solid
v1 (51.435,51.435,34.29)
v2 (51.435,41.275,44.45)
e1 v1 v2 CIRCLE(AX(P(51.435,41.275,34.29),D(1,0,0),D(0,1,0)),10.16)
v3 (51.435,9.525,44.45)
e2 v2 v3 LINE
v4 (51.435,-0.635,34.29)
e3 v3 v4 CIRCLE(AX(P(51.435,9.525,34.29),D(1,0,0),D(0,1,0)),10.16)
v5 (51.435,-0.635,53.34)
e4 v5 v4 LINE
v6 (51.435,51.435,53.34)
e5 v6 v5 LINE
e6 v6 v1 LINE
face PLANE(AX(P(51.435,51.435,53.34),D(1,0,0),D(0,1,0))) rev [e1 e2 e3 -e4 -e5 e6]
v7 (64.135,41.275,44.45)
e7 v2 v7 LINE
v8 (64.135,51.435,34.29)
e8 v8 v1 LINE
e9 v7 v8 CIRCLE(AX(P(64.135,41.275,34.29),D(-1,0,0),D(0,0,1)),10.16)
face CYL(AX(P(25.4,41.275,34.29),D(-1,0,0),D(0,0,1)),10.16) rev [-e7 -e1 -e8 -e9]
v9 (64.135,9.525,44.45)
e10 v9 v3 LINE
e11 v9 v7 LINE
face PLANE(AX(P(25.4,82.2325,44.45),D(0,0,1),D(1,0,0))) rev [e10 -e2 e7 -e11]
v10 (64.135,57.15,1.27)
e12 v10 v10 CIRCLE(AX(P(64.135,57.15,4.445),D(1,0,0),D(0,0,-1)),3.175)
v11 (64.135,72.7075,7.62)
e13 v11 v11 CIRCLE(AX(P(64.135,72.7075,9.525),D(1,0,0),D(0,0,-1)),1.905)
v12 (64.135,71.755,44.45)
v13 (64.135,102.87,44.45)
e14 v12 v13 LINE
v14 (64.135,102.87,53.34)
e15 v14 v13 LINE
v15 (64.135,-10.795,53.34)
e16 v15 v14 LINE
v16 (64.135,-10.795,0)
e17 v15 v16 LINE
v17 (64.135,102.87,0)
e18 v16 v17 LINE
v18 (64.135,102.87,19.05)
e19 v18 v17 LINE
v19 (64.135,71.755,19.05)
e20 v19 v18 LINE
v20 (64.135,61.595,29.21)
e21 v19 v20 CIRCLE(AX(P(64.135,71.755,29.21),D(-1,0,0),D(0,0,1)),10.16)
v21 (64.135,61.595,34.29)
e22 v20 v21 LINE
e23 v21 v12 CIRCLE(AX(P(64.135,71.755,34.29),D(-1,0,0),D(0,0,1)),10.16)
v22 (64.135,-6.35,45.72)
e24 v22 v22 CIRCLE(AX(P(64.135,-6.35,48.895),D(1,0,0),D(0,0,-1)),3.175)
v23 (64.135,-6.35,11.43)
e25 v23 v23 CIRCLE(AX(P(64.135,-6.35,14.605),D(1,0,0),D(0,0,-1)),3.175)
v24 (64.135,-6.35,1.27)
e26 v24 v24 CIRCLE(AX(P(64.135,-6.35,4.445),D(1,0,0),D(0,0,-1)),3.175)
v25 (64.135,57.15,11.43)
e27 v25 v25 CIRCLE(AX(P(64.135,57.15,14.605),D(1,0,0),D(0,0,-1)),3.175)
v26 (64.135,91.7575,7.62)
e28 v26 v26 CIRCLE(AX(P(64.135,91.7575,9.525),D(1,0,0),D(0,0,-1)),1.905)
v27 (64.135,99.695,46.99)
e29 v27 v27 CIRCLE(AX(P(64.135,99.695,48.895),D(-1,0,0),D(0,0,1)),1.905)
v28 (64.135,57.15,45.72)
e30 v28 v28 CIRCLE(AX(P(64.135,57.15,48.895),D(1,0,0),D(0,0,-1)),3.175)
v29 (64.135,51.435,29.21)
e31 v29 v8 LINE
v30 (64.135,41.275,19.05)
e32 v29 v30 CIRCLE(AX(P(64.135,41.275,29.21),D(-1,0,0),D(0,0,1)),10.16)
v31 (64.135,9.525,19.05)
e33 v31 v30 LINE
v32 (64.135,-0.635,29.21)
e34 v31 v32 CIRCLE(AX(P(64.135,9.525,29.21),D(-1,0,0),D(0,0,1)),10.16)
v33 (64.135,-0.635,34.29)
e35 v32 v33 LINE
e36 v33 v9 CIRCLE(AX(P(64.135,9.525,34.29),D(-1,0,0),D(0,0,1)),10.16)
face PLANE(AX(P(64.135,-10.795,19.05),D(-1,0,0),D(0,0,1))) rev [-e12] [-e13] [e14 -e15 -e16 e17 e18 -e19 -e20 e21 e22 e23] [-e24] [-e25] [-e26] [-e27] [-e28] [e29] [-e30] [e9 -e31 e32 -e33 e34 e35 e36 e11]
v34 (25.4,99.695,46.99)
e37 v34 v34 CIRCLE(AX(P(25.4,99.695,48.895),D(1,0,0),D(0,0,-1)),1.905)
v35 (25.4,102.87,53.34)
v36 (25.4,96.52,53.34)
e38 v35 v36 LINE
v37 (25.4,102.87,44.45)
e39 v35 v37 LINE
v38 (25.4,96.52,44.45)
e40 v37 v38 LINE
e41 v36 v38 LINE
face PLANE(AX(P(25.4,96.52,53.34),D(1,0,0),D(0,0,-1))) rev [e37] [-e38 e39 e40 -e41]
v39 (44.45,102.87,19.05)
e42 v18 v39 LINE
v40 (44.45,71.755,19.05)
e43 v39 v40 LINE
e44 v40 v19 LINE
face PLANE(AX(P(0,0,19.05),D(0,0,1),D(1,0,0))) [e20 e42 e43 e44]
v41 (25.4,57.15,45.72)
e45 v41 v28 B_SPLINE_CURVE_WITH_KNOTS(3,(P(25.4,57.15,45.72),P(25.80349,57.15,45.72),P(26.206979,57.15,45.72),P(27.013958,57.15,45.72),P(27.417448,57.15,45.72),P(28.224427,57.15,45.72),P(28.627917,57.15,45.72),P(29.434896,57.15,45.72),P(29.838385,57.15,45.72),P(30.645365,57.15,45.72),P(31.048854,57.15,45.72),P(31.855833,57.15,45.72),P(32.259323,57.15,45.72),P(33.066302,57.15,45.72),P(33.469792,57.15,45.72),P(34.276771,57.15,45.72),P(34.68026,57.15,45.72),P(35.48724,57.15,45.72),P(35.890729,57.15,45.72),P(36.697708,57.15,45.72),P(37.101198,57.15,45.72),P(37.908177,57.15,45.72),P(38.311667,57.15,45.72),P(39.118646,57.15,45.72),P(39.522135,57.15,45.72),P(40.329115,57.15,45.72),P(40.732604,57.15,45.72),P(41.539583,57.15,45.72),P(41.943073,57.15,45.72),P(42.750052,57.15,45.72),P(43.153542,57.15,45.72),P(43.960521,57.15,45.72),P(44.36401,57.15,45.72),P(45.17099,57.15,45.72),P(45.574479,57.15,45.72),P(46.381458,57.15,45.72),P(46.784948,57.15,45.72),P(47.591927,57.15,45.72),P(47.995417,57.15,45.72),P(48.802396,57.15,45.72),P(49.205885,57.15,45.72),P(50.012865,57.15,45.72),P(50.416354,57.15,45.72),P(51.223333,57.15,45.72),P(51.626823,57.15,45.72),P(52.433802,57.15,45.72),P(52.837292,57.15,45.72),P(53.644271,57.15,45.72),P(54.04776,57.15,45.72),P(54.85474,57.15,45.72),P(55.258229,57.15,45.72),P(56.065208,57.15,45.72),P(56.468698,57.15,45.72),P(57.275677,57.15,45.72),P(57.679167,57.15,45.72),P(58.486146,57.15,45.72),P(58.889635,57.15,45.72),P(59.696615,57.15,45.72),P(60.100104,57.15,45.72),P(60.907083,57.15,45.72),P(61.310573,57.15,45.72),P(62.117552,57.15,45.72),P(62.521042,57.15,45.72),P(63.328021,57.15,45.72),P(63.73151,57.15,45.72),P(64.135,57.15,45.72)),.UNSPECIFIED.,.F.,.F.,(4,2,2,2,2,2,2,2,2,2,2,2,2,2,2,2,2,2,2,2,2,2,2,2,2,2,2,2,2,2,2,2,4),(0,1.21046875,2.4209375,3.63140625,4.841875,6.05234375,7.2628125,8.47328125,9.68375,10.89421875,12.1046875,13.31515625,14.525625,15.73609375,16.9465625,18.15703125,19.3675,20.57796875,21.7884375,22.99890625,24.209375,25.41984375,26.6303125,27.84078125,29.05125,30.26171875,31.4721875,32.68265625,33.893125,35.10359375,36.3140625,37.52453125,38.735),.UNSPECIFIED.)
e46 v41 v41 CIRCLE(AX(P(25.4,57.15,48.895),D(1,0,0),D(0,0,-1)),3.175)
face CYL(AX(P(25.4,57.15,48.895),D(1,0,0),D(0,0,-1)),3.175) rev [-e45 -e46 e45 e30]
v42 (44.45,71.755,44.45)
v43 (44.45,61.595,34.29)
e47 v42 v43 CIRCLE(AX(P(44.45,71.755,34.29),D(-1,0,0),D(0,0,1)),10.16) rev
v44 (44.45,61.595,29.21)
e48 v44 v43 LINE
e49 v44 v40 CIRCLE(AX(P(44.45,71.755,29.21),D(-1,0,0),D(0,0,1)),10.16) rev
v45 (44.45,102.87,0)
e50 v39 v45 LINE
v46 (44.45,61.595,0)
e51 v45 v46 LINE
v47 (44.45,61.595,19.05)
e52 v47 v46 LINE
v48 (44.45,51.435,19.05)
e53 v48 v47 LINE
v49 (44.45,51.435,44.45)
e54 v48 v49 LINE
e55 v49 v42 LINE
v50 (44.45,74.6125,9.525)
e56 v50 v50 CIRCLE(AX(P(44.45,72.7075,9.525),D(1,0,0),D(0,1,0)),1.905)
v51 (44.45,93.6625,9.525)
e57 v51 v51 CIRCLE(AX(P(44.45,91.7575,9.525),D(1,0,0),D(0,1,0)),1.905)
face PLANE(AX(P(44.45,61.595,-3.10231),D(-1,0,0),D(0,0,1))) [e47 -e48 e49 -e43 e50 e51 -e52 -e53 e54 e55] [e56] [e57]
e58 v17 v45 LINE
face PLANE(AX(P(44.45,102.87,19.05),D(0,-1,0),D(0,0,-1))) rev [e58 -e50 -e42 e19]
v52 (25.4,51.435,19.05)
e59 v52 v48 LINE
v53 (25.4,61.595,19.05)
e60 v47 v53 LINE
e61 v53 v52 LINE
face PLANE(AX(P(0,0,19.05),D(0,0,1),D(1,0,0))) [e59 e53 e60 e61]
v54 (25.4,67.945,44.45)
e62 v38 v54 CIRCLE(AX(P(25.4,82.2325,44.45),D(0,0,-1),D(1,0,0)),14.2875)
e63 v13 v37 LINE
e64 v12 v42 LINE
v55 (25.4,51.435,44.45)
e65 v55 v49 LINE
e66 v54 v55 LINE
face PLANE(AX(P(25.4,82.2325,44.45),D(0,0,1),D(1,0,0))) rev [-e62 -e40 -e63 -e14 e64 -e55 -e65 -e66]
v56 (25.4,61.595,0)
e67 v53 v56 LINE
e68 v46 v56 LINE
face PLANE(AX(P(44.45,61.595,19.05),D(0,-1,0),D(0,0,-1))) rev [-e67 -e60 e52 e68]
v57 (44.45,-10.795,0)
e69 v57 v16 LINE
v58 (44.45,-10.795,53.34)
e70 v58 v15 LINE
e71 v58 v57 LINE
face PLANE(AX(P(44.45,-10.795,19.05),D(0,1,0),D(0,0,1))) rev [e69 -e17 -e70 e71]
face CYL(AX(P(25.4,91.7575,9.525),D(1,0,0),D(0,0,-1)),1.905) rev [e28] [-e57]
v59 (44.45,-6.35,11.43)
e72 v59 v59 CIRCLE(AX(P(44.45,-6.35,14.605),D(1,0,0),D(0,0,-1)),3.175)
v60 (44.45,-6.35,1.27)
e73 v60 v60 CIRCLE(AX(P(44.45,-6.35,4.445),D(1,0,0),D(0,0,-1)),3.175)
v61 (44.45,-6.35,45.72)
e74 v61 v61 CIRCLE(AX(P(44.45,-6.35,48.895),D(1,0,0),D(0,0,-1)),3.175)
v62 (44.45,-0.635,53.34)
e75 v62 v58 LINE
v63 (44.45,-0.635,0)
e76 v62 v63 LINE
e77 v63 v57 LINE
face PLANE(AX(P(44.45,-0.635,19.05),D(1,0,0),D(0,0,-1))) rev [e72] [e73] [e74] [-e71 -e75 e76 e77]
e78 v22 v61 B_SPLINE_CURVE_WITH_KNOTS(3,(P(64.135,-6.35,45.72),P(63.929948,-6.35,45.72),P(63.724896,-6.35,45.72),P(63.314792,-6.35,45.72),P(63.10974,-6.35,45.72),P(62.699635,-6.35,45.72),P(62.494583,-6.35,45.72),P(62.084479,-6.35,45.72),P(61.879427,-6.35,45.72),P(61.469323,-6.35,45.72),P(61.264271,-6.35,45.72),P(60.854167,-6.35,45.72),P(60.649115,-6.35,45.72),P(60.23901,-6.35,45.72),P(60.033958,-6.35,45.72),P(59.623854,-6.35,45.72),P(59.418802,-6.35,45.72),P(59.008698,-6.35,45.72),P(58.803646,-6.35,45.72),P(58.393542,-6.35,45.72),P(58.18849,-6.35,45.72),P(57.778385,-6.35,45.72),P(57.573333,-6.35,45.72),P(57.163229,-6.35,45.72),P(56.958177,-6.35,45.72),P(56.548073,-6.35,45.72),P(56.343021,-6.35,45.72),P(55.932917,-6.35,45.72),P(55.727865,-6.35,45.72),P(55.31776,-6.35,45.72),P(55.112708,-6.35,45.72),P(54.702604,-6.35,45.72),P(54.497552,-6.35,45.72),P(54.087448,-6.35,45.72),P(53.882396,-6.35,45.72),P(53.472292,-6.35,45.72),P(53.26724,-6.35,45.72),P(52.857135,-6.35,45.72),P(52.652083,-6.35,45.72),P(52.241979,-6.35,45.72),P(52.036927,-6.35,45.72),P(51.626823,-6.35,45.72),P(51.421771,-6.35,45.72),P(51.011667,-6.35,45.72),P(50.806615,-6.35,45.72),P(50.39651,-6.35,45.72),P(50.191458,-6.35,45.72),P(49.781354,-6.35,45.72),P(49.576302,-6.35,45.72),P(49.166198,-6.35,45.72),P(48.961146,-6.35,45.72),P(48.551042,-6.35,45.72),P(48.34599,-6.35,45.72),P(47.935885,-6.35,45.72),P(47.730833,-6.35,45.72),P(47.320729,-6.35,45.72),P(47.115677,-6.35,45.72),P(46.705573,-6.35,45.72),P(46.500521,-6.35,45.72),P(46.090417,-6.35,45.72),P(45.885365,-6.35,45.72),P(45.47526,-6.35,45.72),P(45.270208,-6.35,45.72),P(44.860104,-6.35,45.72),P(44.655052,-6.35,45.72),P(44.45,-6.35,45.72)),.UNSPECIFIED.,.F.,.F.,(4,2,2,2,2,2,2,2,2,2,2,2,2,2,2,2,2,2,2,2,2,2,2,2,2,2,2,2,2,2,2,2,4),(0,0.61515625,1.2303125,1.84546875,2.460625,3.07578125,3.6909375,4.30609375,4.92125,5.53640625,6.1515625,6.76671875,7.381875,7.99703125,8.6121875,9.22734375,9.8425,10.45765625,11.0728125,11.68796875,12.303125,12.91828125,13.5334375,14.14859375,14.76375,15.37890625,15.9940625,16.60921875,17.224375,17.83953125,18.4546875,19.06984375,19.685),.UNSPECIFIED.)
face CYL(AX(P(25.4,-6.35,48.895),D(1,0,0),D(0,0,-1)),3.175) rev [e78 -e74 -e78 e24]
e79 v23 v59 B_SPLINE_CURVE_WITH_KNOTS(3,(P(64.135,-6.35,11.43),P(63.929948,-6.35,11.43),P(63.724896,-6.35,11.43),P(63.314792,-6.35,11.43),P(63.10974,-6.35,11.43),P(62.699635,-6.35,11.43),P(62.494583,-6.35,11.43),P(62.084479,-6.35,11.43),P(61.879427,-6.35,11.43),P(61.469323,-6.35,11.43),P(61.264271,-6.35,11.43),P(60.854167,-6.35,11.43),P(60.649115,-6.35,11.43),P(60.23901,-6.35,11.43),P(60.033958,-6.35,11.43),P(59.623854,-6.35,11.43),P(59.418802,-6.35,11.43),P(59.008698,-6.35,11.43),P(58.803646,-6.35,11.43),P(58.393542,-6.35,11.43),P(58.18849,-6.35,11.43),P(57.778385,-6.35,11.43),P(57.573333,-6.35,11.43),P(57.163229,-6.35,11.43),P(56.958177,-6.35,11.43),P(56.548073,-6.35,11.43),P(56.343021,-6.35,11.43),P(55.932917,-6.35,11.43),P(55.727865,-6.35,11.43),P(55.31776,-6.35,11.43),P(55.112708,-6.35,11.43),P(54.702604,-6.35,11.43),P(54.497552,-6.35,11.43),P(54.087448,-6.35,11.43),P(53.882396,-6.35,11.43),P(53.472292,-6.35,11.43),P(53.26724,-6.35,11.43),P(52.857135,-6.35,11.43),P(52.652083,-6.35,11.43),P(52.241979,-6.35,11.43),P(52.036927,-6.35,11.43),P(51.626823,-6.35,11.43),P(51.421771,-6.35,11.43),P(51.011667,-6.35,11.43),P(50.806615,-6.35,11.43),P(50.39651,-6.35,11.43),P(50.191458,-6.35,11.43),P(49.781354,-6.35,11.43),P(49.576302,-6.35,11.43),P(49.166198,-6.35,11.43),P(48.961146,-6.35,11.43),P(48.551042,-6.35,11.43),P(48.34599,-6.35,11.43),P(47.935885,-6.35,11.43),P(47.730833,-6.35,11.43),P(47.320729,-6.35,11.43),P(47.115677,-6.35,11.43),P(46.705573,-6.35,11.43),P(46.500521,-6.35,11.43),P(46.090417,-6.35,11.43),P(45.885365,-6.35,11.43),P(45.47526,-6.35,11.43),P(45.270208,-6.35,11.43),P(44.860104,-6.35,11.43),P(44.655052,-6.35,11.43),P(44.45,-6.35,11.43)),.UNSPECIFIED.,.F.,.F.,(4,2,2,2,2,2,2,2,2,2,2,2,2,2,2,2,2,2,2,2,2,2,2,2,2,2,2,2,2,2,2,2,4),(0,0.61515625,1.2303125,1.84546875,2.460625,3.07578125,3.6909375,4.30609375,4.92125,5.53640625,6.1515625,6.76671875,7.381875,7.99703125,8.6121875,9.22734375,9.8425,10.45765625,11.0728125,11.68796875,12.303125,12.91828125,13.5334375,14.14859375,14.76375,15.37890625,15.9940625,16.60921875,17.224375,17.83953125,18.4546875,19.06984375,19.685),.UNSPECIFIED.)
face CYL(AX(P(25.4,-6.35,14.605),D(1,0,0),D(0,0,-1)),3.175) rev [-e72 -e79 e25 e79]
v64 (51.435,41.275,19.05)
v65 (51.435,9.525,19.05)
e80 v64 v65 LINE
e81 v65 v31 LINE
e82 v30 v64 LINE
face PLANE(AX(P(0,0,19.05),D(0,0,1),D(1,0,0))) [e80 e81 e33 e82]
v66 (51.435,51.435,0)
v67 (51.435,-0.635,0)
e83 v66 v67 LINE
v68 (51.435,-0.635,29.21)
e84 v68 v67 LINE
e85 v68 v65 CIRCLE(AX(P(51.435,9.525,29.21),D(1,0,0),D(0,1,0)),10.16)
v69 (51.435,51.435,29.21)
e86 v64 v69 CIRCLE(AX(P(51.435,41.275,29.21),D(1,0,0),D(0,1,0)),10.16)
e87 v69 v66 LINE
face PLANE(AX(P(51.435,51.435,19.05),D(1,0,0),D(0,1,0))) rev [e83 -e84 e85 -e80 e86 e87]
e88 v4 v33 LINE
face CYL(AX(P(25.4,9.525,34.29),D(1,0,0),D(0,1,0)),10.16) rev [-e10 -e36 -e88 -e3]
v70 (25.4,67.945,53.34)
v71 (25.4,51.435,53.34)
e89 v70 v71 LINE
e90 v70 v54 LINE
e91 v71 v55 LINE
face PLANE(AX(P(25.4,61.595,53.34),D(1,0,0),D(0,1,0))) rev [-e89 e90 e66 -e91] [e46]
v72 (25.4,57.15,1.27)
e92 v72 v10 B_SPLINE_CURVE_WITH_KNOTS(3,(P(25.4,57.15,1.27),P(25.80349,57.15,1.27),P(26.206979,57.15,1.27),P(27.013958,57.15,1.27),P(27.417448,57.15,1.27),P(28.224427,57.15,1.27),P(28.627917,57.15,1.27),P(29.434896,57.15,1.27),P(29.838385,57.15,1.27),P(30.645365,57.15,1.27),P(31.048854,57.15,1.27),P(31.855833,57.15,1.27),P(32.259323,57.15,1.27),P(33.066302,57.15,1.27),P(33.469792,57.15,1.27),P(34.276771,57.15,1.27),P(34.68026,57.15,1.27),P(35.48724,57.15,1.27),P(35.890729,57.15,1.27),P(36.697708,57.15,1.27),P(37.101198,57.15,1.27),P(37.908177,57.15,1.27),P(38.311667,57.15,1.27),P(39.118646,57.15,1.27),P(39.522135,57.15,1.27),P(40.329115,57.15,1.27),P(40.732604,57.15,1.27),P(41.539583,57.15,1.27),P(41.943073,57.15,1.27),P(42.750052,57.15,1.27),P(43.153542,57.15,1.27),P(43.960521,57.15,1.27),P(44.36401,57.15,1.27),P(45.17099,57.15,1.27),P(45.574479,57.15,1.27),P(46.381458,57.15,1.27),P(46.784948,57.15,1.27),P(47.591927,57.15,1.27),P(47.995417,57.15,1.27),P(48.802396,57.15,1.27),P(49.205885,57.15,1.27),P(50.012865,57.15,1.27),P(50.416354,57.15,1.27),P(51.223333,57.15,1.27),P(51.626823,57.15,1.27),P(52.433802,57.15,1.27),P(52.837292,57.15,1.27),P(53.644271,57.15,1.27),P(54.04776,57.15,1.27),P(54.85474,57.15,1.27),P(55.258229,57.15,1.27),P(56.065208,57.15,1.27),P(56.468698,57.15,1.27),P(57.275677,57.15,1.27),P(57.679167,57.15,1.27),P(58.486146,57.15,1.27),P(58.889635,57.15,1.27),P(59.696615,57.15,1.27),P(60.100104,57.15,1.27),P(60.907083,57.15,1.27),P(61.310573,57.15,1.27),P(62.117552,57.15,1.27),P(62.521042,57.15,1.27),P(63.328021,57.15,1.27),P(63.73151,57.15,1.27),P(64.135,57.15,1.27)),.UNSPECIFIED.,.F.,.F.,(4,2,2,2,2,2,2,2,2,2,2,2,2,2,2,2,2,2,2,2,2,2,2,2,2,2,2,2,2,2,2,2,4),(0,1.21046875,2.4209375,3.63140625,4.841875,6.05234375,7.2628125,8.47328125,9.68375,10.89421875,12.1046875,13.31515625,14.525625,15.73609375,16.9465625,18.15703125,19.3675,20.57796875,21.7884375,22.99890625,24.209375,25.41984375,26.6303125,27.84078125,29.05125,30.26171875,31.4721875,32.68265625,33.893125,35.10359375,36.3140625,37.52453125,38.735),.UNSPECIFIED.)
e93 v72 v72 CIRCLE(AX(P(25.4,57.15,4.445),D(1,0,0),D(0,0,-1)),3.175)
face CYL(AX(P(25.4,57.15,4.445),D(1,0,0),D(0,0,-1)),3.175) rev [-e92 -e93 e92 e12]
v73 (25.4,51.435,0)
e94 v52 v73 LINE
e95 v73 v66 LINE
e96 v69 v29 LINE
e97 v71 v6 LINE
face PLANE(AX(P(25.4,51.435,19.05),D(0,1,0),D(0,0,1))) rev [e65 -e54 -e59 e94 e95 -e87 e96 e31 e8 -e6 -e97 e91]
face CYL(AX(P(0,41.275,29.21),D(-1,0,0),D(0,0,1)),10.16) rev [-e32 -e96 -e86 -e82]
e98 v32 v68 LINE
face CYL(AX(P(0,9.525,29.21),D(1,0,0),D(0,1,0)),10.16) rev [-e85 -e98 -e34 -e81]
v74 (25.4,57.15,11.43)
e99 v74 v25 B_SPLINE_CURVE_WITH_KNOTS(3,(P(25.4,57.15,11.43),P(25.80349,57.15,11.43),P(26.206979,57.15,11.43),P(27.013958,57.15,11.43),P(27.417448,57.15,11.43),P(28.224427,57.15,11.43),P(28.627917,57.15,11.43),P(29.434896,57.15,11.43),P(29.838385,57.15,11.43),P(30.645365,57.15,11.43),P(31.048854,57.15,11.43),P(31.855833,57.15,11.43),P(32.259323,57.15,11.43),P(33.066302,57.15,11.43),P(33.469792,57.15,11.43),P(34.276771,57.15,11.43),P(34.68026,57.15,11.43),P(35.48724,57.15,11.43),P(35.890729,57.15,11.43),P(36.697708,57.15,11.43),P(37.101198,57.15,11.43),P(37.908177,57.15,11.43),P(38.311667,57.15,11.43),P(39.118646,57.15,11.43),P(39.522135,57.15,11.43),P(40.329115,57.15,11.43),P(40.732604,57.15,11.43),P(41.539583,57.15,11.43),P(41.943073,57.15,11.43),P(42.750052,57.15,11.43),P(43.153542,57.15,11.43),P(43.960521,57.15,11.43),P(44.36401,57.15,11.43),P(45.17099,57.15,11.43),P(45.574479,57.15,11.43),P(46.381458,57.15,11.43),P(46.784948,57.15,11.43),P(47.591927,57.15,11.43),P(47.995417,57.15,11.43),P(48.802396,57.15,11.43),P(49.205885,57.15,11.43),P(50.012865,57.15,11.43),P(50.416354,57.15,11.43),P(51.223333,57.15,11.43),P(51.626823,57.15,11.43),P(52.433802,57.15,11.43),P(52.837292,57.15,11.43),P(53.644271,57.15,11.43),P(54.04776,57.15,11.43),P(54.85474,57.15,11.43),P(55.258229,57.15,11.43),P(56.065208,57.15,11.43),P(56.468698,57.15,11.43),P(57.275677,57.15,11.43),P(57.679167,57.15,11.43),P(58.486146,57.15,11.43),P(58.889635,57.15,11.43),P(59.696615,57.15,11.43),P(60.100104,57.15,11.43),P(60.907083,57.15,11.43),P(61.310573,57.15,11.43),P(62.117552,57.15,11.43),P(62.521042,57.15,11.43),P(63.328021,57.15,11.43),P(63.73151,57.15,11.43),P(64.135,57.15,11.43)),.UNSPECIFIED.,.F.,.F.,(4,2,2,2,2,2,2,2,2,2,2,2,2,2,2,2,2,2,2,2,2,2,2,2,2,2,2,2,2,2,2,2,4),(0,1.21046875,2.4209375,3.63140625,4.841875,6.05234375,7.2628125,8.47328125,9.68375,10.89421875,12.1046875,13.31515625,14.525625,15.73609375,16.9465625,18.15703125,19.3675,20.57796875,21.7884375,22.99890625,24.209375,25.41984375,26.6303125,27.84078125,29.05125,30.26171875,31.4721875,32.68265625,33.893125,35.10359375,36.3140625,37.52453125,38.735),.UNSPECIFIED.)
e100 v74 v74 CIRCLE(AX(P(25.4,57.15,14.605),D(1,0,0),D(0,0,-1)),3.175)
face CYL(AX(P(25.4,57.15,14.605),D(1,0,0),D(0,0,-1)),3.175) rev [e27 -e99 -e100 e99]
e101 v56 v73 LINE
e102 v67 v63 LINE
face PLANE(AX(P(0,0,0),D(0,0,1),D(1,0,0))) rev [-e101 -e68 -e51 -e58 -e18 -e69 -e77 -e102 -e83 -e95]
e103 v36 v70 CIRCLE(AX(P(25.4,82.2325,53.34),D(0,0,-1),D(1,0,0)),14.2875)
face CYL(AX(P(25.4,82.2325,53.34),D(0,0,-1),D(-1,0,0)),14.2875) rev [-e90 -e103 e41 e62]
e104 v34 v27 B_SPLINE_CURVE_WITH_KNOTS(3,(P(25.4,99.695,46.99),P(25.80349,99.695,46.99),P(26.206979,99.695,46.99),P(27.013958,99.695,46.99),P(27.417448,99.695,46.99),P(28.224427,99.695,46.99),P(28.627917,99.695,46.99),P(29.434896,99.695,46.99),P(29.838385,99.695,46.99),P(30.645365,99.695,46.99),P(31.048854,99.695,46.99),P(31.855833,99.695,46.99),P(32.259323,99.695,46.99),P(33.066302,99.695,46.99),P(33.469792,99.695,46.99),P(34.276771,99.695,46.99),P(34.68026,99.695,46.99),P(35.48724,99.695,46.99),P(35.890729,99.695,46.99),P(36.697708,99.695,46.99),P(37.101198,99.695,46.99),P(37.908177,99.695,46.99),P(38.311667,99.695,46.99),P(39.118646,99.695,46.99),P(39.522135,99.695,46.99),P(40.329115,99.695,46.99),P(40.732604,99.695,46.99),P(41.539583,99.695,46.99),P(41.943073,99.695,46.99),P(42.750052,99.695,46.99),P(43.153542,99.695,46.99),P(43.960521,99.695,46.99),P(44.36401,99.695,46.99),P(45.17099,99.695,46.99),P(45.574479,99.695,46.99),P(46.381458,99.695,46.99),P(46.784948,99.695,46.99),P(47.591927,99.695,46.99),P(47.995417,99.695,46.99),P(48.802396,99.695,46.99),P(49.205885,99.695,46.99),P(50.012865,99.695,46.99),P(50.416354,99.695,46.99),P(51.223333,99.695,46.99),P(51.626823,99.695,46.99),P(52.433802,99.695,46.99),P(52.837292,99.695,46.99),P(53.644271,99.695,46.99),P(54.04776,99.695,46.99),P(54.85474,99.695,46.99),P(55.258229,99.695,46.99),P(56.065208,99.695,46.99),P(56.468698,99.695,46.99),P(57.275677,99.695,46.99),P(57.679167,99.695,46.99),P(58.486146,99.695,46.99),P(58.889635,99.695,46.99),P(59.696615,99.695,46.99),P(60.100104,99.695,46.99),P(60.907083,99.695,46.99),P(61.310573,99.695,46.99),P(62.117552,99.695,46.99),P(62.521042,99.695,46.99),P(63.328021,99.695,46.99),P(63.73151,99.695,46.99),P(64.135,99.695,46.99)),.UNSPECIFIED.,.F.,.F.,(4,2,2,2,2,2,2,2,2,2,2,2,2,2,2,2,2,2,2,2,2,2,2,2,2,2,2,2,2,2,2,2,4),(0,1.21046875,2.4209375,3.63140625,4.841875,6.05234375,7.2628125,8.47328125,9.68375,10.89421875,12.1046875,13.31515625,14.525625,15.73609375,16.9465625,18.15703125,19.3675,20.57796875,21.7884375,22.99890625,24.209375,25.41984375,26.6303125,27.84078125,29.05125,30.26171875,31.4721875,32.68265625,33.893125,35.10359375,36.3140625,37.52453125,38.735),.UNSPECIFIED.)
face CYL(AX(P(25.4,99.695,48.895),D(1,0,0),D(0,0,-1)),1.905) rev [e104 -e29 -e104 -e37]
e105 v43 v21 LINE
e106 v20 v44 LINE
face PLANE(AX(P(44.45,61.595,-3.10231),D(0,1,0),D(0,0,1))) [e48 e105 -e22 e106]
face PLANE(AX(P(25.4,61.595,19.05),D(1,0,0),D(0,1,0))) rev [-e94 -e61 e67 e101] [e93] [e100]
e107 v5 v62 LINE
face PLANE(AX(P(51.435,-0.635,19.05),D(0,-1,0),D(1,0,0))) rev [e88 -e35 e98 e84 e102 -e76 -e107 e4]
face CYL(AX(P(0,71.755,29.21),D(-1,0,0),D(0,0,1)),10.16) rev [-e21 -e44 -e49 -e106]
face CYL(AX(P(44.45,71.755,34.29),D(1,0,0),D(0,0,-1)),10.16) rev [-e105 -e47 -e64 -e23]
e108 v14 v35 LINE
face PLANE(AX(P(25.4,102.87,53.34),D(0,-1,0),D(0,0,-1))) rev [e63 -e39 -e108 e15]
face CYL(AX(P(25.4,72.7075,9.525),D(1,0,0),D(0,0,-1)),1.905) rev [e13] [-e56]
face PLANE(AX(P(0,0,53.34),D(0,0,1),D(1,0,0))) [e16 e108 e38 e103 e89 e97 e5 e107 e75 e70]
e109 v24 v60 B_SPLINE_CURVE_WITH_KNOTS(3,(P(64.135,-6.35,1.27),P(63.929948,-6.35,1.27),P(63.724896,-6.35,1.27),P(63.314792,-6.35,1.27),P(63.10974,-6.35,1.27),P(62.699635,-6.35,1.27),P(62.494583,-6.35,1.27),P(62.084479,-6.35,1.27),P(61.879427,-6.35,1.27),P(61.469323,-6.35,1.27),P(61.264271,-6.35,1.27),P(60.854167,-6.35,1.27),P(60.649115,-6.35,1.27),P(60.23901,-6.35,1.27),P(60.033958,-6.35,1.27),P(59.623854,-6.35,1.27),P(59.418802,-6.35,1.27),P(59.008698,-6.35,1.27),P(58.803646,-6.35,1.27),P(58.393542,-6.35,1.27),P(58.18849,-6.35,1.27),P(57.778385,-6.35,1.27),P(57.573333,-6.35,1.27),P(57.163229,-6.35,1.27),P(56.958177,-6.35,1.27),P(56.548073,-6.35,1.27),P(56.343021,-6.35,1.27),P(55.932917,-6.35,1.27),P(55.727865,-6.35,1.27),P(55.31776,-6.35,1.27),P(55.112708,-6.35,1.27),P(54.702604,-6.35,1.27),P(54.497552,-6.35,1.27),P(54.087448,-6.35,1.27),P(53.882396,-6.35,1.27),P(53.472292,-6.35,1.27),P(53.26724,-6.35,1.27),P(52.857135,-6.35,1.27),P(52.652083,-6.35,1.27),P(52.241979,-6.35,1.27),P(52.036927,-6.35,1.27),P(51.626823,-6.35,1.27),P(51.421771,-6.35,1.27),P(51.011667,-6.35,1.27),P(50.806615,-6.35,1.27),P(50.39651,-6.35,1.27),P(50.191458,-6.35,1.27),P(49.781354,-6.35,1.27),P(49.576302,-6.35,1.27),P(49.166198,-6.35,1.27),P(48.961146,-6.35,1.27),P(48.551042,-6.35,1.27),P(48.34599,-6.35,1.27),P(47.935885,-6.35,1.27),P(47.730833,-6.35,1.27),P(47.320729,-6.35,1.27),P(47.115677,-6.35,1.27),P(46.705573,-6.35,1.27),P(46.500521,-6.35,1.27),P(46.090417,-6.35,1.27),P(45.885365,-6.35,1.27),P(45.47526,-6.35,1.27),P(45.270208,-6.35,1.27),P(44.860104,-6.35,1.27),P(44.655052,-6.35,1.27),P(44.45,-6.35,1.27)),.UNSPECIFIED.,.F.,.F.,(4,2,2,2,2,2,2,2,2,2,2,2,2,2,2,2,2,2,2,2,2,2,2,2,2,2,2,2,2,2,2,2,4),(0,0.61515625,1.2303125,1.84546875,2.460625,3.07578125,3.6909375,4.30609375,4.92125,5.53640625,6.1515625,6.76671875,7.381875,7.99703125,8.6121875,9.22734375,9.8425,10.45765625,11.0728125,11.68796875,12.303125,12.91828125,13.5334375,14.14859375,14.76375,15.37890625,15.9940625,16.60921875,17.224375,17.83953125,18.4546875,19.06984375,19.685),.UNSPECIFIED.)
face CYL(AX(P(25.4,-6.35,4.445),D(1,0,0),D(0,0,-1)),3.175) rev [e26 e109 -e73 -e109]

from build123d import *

# Parameters (mm, degrees)
BOSS_EXTRUDE1_DEPTH     = 19.05
CUT_EXTRUDE1_DEPTH      = 112.559578813
CUT_EXTRUDE1_DEPTH_BACK = 112.559578813
SKETCH2_R               = 1.905
BOSS_EXTRUDE2_START     = 25.4
BOSS_EXTRUDE2_DEPTH     = 8.89
SKETCH5_W               = 19.685
SKETCH5_H               = 10.16
BOSS_EXTRUDE4_DEPTH     = 34.29
CUT_EXTRUDE2_DEPTH      = 123.179346557
CUT_EXTRUDE2_DEPTH_BACK = 123.179346557
SKETCH6_R               = 3.175
CUT_EXTRUDE4_DEPTH      = 123.179346557
CUT_EXTRUDE4_DEPTH_BACK = 123.179346557
SKETCH9_R               = 3.175
FILLET1_R               = 10.16
CUT_EXTRUDE8_DEPTH      = 123.179346557
CUT_EXTRUDE8_DEPTH_BACK = 123.179346557
SKETCH14_R              = 1.905


with BuildPart() as part:
    # Sketch1 → Boss-Extrude1 (new body)
    with BuildSketch(Plane.XY):
        Polygon((44.45, -0.635), (44.45, -10.795), (64.135, -10.795), (64.135, 102.87), (44.45, 102.87), (44.45, 100.33), (44.45, 61.595), (25.4, 61.595), (25.4, 51.435), (51.435, 51.435), (51.435, -0.635), align=None)
    extrude(amount=BOSS_EXTRUDE1_DEPTH)

    # Sketch2 → Cut-Extrude1 (cut, two sides: drawn at the far end of the back side and taken through both)
    with BuildSketch(Plane(origin=(64.135, 0, 0), x_dir=(0, 0, -1), z_dir=(1, 0, 0)).offset(-CUT_EXTRUDE1_DEPTH_BACK)):
        with Locations((-9.525, 91.7575)):
            Circle(SKETCH2_R)
        with Locations((-9.525, 72.7075)):
            Circle(SKETCH2_R)
    extrude(amount=CUT_EXTRUDE1_DEPTH + CUT_EXTRUDE1_DEPTH_BACK, mode=Mode.SUBTRACT)



with BuildPart() as body_2:
    # Sketch3 → Boss-Extrude2 (new body)
    with BuildSketch(Plane.XY.offset(19.05).offset(BOSS_EXTRUDE2_START)):
        with BuildLine():
            Line((25.4, 96.52), (25.4, 102.87))
            Line((25.4, 102.87), (44.45, 102.87))
            Line((44.45, 102.87), (64.135, 102.87))
            Line((64.135, 102.87), (64.135, -10.795))
            Line((64.135, -10.795), (44.45, -10.795))
            Line((44.45, -10.795), (44.45, -0.635))
            Line((44.45, -0.635), (51.435, -0.635))
            Line((51.435, -0.635), (51.435, 51.435))
            Line((51.435, 51.435), (25.4, 51.435))
            Line((25.4, 51.435), (25.4, 61.595))
            Line((25.4, 61.595), (25.4, 67.945))
            ThreePointArc((25.4, 67.945), (39.6875, 82.2325), (25.4, 96.52))
        make_face()
    extrude(amount=BOSS_EXTRUDE2_DEPTH)


with BuildPart() as part_1:
    add(part.part)

    add(body_2.part)  # Boss-Extrude4 merges body 2
    # Sketch5 → Boss-Extrude4 (add)
    with BuildSketch(Plane.XY.offset(53.34)):
        with Locations((54.2925, -5.715)):
            Rectangle(SKETCH5_W, SKETCH5_H)
        with Locations((54.2925, 56.515)):
            Rectangle(SKETCH5_W, SKETCH5_H)
    extrude(amount=-BOSS_EXTRUDE4_DEPTH)

    # Sketch6 → Cut-Extrude2 (cut, two sides: drawn at the far end of the back side and taken through both)
    with BuildSketch(Plane(origin=(64.135, 0, 0), x_dir=(0, 0, -1), z_dir=(1, 0, 0)).offset(-CUT_EXTRUDE2_DEPTH_BACK)):
        with Locations((-14.605, 57.15)):
            Circle(SKETCH6_R)
        with Locations((-4.445, 57.15)):
            Circle(SKETCH6_R)
        with Locations((-14.605, -6.35)):
            Circle(SKETCH6_R)
        with Locations((-4.445, -6.35)):
            Circle(SKETCH6_R)
    extrude(amount=CUT_EXTRUDE2_DEPTH + CUT_EXTRUDE2_DEPTH_BACK, mode=Mode.SUBTRACT)

    # Sketch9 → Cut-Extrude4 (cut, two sides: drawn at the far end of the back side and taken through both)
    with BuildSketch(Plane(origin=(64.135, 0, 0), x_dir=(0, 0, -1), z_dir=(1, 0, 0)).offset(-CUT_EXTRUDE4_DEPTH_BACK)):
        with Locations((-48.895, 57.15)):
            Circle(SKETCH9_R)
        with Locations((-48.895, -6.35)):
            Circle(SKETCH9_R)
    extrude(amount=CUT_EXTRUDE4_DEPTH + CUT_EXTRUDE4_DEPTH_BACK, mode=Mode.SUBTRACT)

    # Fillet1
    # the kernel refuses this fillet: 10.16 mm, written as the material it adds along each edge
    with BuildSketch(Plane(origin=(44.45, 61.595, 19.05), x_dir=(0, 1, 0), z_dir=(1, 0, 0))) as fillet1_piece_1:
        with BuildLine():
            CenterArc((FILLET1_R, FILLET1_R), FILLET1_R, 180, 90)
            Line((0, FILLET1_R), (0, 0))
            Line((0, 0), (FILLET1_R, 0))
        make_face()
    extrude(amount=19.685)
    with BuildSketch(Plane(origin=(64.135, 51.435, 19.05), x_dir=(0, -1, 0), z_dir=(-1, 0, 0)), Plane(origin=(51.435, 51.435, 44.45), x_dir=(0, -1, 0), z_dir=(1, 0, 0))) as fillet1_piece_2:
        with BuildLine():
            CenterArc((FILLET1_R, FILLET1_R), FILLET1_R, 180, 90)
            Line((0, FILLET1_R), (0, 0))
            Line((0, 0), (FILLET1_R, 0))
        make_face()
    extrude(amount=12.7)
    with BuildSketch(Plane(origin=(64.135, 61.595, 44.45), x_dir=(0, 0, -1), z_dir=(-1, 0, 0))) as fillet1_piece_3:
        with BuildLine():
            CenterArc((FILLET1_R, -FILLET1_R), FILLET1_R, 90, 90)
            Line((0, -FILLET1_R), (0, 0))
            Line((0, 0), (FILLET1_R, 0))
        make_face()
    extrude(amount=19.685)
    with BuildSketch(Plane(origin=(64.135, -0.635, 44.45), x_dir=(0, 0, -1), z_dir=(-1, 0, 0)), Plane(origin=(51.435, -0.635, 19.05), x_dir=(0, 0, 1), z_dir=(1, 0, 0))) as fillet1_piece_4:
        with BuildLine():
            CenterArc((FILLET1_R, -FILLET1_R), FILLET1_R, 90, 90)
            Line((0, -FILLET1_R), (0, 0))
            Line((0, 0), (FILLET1_R, 0))
        make_face()
    extrude(amount=12.7)

    # Sketch14 → Cut-Extrude8 (cut, two sides: drawn at the far end of the back side and taken through both)
    with BuildSketch(Plane(origin=(64.135, 0, 0), x_dir=(0, 0, -1), z_dir=(1, 0, 0)).offset(-CUT_EXTRUDE8_DEPTH_BACK)):
        with Locations((-48.895, 99.695)):
            Circle(SKETCH14_R)
    extrude(amount=CUT_EXTRUDE8_DEPTH + CUT_EXTRUDE8_DEPTH_BACK, mode=Mode.SUBTRACT)


solid = part_1.part
